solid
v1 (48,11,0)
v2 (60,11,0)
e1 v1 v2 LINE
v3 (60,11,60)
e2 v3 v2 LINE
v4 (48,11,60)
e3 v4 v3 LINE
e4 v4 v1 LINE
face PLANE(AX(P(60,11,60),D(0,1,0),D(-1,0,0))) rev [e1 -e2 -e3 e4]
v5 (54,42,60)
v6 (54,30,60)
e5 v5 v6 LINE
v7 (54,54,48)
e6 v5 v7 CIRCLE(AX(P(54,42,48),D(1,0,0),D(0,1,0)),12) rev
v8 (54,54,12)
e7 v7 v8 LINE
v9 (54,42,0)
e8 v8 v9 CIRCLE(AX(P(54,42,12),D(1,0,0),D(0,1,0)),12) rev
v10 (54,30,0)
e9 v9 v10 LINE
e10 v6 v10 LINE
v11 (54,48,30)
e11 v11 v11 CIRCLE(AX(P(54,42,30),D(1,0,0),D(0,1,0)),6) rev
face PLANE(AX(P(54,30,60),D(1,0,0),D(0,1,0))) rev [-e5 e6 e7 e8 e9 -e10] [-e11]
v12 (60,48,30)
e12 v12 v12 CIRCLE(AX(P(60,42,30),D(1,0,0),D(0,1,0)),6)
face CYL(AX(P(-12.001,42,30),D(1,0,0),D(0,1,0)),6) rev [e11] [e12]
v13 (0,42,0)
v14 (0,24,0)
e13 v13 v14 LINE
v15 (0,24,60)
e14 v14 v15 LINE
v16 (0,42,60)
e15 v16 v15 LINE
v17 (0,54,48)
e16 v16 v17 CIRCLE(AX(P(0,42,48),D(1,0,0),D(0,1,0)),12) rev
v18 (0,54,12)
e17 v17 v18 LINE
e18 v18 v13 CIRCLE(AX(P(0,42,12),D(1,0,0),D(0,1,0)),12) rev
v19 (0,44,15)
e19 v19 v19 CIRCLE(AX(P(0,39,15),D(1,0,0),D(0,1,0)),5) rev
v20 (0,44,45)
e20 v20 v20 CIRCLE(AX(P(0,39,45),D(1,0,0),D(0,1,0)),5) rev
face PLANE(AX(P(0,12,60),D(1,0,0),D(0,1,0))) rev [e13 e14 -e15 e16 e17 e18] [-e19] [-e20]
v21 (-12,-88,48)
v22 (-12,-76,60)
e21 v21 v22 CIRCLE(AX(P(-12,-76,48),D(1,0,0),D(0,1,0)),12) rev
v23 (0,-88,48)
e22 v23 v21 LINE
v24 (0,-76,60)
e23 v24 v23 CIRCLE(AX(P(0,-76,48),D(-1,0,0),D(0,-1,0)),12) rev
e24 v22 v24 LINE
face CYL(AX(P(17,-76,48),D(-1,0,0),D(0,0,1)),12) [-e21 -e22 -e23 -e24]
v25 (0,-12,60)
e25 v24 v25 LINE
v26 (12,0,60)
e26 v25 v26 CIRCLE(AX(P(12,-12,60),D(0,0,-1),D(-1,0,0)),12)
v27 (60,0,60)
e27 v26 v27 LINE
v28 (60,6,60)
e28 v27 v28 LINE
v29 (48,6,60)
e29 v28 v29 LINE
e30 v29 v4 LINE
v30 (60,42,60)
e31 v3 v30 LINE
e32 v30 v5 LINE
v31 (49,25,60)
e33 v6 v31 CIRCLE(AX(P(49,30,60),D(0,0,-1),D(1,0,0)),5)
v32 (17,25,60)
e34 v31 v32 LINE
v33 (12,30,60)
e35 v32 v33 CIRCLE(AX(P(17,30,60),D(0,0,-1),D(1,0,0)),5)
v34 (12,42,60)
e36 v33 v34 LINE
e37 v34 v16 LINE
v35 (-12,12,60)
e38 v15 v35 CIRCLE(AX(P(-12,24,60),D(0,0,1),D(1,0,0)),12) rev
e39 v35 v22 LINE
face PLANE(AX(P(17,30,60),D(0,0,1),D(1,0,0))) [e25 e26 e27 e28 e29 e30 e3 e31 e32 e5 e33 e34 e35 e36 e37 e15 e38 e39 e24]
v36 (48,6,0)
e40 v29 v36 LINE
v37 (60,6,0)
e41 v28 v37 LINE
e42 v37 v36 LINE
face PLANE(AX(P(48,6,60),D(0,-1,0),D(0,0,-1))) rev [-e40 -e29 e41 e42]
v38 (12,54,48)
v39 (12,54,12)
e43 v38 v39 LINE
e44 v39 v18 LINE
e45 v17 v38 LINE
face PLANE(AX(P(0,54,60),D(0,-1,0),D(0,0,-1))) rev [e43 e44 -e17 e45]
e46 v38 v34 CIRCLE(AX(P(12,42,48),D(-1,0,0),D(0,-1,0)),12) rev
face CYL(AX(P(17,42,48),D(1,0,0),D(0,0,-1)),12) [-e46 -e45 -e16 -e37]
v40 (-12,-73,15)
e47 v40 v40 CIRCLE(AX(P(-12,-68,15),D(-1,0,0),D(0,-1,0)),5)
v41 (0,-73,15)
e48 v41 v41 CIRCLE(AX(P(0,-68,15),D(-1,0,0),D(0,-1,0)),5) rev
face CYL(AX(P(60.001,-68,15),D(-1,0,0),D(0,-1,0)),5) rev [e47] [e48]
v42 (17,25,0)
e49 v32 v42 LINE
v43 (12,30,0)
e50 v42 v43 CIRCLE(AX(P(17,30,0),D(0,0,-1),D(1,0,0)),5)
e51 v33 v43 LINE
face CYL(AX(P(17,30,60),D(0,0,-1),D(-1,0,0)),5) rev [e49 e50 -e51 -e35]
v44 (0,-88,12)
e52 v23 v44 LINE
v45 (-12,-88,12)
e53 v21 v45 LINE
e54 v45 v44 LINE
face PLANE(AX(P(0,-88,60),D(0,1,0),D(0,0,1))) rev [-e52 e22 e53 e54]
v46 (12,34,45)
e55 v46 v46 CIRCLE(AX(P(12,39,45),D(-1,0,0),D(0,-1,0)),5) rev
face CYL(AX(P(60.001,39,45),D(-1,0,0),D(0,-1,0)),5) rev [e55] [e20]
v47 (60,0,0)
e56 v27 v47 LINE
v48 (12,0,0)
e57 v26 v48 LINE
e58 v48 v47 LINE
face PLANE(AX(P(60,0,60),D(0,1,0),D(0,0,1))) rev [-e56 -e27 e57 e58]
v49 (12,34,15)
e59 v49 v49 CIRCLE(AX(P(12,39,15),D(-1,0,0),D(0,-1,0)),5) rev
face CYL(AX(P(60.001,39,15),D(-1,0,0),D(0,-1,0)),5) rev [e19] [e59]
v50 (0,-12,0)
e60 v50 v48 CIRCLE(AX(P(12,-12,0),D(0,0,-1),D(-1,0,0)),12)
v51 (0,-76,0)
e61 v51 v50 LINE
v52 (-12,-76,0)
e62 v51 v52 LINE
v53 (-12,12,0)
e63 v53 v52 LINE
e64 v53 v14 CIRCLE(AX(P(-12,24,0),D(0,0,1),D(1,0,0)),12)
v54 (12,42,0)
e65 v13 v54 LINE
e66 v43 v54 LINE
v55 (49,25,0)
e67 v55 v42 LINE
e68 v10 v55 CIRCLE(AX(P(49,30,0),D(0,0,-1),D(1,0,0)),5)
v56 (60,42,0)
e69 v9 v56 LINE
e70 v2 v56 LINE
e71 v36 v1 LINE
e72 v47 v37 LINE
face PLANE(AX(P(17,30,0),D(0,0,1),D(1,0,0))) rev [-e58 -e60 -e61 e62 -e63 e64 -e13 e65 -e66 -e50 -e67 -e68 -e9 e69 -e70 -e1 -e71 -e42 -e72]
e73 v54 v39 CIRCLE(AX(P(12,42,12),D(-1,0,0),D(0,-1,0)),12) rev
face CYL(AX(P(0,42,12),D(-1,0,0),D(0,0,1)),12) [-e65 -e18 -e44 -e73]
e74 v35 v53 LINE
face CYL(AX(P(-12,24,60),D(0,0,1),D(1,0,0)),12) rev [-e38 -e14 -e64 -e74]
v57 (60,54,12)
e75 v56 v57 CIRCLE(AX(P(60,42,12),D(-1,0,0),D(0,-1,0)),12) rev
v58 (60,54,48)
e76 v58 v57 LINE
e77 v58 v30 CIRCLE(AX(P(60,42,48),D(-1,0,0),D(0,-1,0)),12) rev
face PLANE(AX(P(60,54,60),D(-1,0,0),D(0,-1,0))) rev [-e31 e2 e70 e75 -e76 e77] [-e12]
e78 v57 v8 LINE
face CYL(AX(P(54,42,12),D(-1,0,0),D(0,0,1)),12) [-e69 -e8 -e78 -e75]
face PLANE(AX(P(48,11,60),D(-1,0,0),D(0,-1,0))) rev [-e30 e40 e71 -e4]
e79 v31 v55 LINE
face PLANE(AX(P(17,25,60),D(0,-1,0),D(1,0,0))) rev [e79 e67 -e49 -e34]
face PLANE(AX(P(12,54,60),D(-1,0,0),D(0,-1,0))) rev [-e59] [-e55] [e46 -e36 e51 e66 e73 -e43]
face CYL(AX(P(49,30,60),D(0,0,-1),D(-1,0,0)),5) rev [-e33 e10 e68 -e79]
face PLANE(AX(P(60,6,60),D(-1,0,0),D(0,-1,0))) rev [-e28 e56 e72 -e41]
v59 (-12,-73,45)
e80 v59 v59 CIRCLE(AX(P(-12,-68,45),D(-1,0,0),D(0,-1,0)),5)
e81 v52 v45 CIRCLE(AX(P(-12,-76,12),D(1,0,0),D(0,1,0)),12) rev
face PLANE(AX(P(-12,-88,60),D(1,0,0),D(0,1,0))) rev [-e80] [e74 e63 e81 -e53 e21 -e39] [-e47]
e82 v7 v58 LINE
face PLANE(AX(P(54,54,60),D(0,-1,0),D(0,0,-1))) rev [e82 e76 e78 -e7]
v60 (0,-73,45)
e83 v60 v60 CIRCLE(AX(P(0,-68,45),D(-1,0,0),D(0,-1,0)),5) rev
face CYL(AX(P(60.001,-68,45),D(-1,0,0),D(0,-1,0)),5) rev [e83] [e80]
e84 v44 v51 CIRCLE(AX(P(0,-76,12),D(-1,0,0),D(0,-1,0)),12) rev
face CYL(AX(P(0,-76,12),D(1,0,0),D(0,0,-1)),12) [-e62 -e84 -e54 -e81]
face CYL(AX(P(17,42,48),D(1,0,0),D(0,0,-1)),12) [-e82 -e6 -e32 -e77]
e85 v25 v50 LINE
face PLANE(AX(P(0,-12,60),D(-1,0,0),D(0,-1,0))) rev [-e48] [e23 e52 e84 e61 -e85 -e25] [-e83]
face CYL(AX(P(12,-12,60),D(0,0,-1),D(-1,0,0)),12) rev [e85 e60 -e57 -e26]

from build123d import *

# Parameters (mm, degrees)
BOSS_EXTRUDE1_DEPTH = 60
FILLET1_R           = 12
FILLET2_R           = 12
CUT_EXTRUDE1_REACH  = 130.561
SKETCH4_R           = 5
CUT_EXTRUDE2_REACH  = 130.561
SKETCH5_R           = 6


with BuildPart() as part:
    # Sketch2 → Boss-Extrude1 (new body)
    with BuildSketch(Plane.XY):
        with BuildLine():
            Line((0, -12), (0, -88))
            Line((0, -88), (-12, -88))
            Line((-12, -88), (-12, 12))
            Line((-12, 12), (0, 12))
            Line((0, 12), (0, 54))
            Line((0, 54), (12, 54))
            Line((12, 54), (12, 30))
            ThreePointArc((12, 30), (13.464466094, 26.464466094), (17, 25))
            Line((17, 25), (49, 25))
            ThreePointArc((49, 25), (52.535533906, 26.464466094), (54, 30))
            Line((54, 30), (54, 54))
            Line((54, 54), (60, 54))
            Line((60, 54), (60, 11))
            Line((60, 11), (48, 11))
            Line((48, 11), (48, 6))
            Line((48, 6), (60, 6))
            Line((60, 6), (60, 0))
            Line((60, 0), (12, 0))
            ThreePointArc((12, 0), (3.514718626, -3.514718626), (0, -12))
        make_face()
    extrude(amount=BOSS_EXTRUDE1_DEPTH)

    # Fillet1
    fillet1_edges = [part.edges().sort_by_distance(p)[0] for p in [
        (0, 12, 30),
    ]]
    fillet(fillet1_edges, radius=FILLET1_R - 0.0001)  # a hair under: the kernel refuses the full size

    # Fillet2
    fillet2_edges = [part.edges().sort_by_distance(p)[0] for p in [
        (6, 54, 0),
        (57, 54, 0),
        (-6, -88, 0),
        (57, 54, 60),
        (-6, -88, 60),
        (6, 54, 60),
    ]]
    fillet(fillet2_edges, radius=FILLET2_R)

    # Sketch4 → Cut-Extrude1 (cut, up to next)
    with BuildSketch(Plane.ZY.offset(12), mode=Mode.PRIVATE) as cut_extrude1_sk1:
        with Locations(Location((15, -68, 0), (0, 0, 270))):
            Circle(SKETCH4_R)
    cut_extrude1_tool1 = extrude(cut_extrude1_sk1.sketch, amount=-CUT_EXTRUDE1_REACH, mode=Mode.PRIVATE) & part.part
    # Sketch4 → Cut-Extrude1 (cut, up to next)
    with BuildSketch(Plane.ZY.offset(12), mode=Mode.PRIVATE) as cut_extrude1_sk2:
        with Locations(Location((45, -68, 0), (0, 0, 270))):
            Circle(SKETCH4_R)
    cut_extrude1_tool2 = extrude(cut_extrude1_sk2.sketch, amount=-CUT_EXTRUDE1_REACH, mode=Mode.PRIVATE) & part.part
    # Sketch4 → Cut-Extrude1 (cut, up to next)
    with BuildSketch(Plane.ZY.offset(12), mode=Mode.PRIVATE) as cut_extrude1_sk3:
        with Locations(Location((15, 39, 0), (0, 0, 270))):
            Circle(SKETCH4_R)
    cut_extrude1_tool3 = extrude(cut_extrude1_sk3.sketch, amount=-CUT_EXTRUDE1_REACH, mode=Mode.PRIVATE) & part.part
    # Sketch4 → Cut-Extrude1 (cut, up to next)
    with BuildSketch(Plane.ZY.offset(12), mode=Mode.PRIVATE) as cut_extrude1_sk4:
        with Locations(Location((45, 39, 0), (0, 0, 270))):
            Circle(SKETCH4_R)
    cut_extrude1_tool4 = extrude(cut_extrude1_sk4.sketch, amount=-CUT_EXTRUDE1_REACH, mode=Mode.PRIVATE) & part.part
    add(cut_extrude1_tool1.solids().sort_by_distance((-12, -68, 15))[0], mode=Mode.SUBTRACT)
    add(cut_extrude1_tool2.solids().sort_by_distance((-12, -68, 45))[0], mode=Mode.SUBTRACT)
    add(cut_extrude1_tool3.solids().sort_by_distance((-12, 39, 15))[0], mode=Mode.SUBTRACT)
    add(cut_extrude1_tool4.solids().sort_by_distance((-12, 39, 45))[0], mode=Mode.SUBTRACT)

    # Sketch5 → Cut-Extrude2 (cut, up to next)
    with BuildSketch(Plane(origin=(60, 0, 0), x_dir=(0, 0, -1), z_dir=(1, 0, 0)), mode=Mode.PRIVATE) as cut_extrude2_sk1:
        with Locations(Location((-30, 42, 0), (0, 0, 90))):
            Circle(SKETCH5_R)
    cut_extrude2_tool1 = extrude(cut_extrude2_sk1.sketch, amount=-CUT_EXTRUDE2_REACH, mode=Mode.PRIVATE) & part.part
    add(cut_extrude2_tool1.solids().sort_by_distance((60, 42, 30))[0], mode=Mode.SUBTRACT)


solid = part.part
